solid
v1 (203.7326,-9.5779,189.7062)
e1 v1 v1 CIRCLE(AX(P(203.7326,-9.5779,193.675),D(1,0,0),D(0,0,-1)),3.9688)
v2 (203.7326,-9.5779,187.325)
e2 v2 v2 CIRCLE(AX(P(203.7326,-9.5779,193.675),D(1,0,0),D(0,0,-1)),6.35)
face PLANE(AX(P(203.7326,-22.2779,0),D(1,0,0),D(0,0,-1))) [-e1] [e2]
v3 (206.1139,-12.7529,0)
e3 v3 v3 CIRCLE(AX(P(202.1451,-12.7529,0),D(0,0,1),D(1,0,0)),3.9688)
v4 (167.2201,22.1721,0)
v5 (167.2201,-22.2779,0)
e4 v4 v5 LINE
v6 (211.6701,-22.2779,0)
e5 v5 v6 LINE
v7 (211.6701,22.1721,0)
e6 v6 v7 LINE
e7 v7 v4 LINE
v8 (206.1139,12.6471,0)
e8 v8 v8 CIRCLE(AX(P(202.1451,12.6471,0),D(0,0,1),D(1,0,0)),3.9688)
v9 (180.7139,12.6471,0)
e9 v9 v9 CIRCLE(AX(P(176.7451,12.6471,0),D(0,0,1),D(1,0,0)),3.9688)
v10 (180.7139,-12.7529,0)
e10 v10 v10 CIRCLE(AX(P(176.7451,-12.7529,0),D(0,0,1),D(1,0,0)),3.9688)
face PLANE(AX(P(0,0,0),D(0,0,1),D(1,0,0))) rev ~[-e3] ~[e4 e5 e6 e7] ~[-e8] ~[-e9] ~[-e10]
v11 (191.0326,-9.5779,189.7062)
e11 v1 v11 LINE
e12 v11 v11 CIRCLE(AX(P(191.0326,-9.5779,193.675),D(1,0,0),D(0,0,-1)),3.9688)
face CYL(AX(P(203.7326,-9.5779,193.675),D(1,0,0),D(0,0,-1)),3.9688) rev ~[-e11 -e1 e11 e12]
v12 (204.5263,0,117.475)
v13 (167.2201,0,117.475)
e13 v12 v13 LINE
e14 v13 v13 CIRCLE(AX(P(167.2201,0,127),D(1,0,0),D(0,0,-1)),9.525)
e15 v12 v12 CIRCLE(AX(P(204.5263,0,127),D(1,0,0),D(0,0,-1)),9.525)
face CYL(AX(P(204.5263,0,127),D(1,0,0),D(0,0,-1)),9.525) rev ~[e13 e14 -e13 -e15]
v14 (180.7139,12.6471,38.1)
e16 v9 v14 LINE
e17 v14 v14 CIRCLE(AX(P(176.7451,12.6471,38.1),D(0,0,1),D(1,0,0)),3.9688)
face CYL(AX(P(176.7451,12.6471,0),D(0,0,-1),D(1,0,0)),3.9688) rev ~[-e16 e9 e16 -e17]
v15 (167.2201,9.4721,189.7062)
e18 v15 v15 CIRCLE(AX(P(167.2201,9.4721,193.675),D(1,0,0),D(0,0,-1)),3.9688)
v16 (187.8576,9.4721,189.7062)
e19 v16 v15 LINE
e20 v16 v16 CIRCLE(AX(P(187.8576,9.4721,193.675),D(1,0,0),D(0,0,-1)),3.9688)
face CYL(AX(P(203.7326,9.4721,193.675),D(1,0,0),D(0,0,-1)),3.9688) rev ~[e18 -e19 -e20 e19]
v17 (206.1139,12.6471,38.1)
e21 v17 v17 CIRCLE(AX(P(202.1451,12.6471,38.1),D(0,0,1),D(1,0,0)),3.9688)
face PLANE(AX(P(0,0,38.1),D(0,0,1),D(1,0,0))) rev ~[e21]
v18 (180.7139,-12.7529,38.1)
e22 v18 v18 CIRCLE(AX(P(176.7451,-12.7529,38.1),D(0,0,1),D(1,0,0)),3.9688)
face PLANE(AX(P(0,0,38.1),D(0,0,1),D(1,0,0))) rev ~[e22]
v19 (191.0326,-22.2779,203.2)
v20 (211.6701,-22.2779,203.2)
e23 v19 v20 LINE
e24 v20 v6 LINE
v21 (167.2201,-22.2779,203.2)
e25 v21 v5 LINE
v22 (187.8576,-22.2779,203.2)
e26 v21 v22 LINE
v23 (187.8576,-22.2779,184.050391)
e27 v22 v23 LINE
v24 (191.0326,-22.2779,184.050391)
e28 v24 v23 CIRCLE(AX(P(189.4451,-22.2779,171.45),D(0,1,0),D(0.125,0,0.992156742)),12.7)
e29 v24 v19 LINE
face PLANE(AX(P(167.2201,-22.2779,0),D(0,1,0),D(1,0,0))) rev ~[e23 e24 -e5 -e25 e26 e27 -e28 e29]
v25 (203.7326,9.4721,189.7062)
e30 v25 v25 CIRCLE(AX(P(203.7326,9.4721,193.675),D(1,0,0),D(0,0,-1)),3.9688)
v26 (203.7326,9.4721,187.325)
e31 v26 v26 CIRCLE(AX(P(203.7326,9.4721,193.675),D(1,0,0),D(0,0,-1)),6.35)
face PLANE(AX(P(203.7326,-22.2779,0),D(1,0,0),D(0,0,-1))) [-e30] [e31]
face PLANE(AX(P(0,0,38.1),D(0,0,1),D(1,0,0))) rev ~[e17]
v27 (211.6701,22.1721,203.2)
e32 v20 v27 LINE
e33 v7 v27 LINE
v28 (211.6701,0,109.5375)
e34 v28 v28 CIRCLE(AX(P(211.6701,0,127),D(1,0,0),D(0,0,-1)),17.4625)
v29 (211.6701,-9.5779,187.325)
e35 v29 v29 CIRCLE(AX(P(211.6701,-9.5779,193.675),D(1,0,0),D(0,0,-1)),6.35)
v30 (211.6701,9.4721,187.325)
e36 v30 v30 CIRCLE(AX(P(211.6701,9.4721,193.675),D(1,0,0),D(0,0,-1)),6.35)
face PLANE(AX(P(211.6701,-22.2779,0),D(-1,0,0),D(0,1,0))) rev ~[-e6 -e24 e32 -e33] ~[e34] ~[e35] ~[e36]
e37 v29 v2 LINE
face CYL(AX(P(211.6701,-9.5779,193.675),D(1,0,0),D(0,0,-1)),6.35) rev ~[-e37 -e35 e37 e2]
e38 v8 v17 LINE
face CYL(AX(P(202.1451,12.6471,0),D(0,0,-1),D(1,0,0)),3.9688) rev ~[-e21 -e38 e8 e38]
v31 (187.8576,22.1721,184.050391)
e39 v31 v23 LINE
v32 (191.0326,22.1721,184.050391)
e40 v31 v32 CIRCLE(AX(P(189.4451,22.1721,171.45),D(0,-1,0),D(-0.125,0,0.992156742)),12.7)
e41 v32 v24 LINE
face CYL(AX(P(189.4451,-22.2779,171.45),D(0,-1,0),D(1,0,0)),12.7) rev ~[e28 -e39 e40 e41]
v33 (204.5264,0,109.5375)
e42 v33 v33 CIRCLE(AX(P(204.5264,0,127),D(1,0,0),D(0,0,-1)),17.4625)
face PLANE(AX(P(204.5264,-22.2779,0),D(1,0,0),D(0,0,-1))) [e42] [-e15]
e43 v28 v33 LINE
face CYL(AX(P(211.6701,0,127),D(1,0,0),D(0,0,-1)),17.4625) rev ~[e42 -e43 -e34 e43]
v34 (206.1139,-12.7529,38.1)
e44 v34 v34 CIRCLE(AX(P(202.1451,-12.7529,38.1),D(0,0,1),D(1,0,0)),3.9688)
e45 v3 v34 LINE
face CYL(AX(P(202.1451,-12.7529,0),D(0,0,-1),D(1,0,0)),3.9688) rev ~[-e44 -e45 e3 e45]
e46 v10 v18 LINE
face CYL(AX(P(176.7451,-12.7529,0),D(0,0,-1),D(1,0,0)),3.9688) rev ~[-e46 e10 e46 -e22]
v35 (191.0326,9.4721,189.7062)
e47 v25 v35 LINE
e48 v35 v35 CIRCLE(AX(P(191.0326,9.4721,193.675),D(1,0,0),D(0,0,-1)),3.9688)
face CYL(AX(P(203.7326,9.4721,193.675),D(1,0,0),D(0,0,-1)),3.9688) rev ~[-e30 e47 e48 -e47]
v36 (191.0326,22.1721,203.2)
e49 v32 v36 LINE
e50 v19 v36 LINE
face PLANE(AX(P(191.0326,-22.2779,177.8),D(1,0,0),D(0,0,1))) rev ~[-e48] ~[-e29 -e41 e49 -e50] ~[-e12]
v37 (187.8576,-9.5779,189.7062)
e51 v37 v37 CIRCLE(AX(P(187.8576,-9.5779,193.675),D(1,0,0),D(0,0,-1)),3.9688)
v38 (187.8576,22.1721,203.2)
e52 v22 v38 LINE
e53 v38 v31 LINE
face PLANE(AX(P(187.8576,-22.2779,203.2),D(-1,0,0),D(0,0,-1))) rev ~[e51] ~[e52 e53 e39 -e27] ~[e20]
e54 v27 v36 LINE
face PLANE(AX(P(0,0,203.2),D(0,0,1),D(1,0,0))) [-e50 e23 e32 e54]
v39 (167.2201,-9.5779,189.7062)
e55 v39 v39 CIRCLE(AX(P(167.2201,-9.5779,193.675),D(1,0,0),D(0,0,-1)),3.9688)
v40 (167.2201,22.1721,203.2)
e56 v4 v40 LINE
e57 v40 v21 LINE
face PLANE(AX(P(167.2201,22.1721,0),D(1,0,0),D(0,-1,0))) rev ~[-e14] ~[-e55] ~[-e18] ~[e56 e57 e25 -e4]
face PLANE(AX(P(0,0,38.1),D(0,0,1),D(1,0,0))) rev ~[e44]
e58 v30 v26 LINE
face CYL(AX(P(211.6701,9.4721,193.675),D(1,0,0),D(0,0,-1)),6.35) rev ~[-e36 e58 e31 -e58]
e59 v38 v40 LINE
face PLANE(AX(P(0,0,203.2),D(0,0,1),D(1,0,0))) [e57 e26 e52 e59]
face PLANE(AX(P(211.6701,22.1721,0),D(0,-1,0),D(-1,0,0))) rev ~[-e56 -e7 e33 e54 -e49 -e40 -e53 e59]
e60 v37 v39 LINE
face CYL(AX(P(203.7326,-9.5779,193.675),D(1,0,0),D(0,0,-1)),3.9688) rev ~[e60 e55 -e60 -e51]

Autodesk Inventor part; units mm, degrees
ref_plane "YZ Plane" through (0, 0, 0) normal (1, 0, 0) x (0, 1, 0)
ref_plane "XZ Plane" through (0, 0, 0) normal (0, 1, 0) x (-1, 0, 0)
ref_plane "XY Plane" through (0, 0, 0) normal (0, 0, 1) x (1, 0, 0)
sketch "Sketch1" plane through (0, 0, 0) normal (0, 0, 1) x (1, 0, 0)
  circle A0 centre (202.1451, 12.6471) radius 3.9688 projected
  circle A1 centre (202.1451, -12.7529) radius 3.9688 projected
  circle A2 centre (176.7451, 12.6471) radius 3.9688 projected
  circle A3 centre (176.7451, -12.7529) radius 3.9688 projected
  line L0 (211.6701, 22.1721) -> (167.2201, 22.1721)
  line L1 (167.2201, 22.1721) -> (167.2201, -22.2779)
  line L2 (167.2201, -22.2779) -> (211.6701, -22.2779)
  line L3 (211.6701, -22.2779) -> (211.6701, 22.1721)
  point P0 (0, 0)
  dimension "d0" = 9.525
  dimension "d1" = 9.525
  dimension "d2" = 44.45
  dimension "d3" = 44.45
extrude "Extrusion1" add sketch "Sketch1" along normal blind 38.1
sketch "Sketch2" plane through (0, 0, 38.1) normal (0, 0, 1) x (1, 0, 0)
  line L0 (211.6701, -22.2779) -> (211.6701, 22.1721) projected
  line L1 (167.2201, 22.1721) -> (167.2201, -22.2779) projected
  line L2 (211.6701, 22.1721) -> (167.2201, 22.1721)
  line L3 (167.2201, 22.1721) -> (167.2201, -22.2779)
  line L4 (167.2201, -22.2779) -> (211.6701, -22.2779)
  line L5 (211.6701, -22.2779) -> (211.6701, 22.1721)
  point P0 (0, 0)
extrude "Extrusion2" add sketch "Sketch2" along normal blind 165.1
sketch "Sketch3" plane through (167.2201, -22.2779, 0) normal (-1, 0, 0) x (0, 0, 1)
  point P0 (0, 22.2779)
sketch "Sketch4" plane through (211.6701, -22.2779, 0) normal (1, 0, 0) x (0, 0, -1)
  circle A0 centre (-127, 22.2779) radius 17.4625
  point P0 (0, 22.2779)
  dimension "d8" = 34.925
  dimension "d11" = 127
extrude "Extrusion3" cut sketch "Sketch4" against normal blind 7.1437
sketch "Sketch5" plane through (204.5263, 0, 127) normal (1, 0, 0) x (0, 0, -1)
  circle A0 centre (0, 0) radius 9.525
  point P0 (127, 0)
  dimension "d12" = 19.05
extrude "Extrusion4" cut sketch "Sketch5" against normal blind 50.8
sketch "Sketch6" plane through (167.2201, -22.2779, 0) normal (0, -1, 0) x (1, 0, 0)
  circle A0 centre (22.225, 171.45) radius 12.7
  line L0 (0, 203.2) -> (44.45, 203.2) projected
  point P0 (-167.2201, 0)
  dimension "d15" = 25.4
  dimension "d16" = 31.75
extrude "Extrusion5" cut sketch "Sketch6" against normal blind 50.8
sketch "Sketch7" plane through (167.2201, -22.2779, 0) normal (0, -1, 0) x (1, 0, 0)
  line L0 (44.45, 203.2) -> (0, 203.2) projected
  line L1 (23.8125, 203.2) -> (20.6375, 203.2)
  line L2 (20.6375, 203.2) -> (20.6375, 177.8)
  line L3 (20.6375, 177.8) -> (23.8125, 177.8)
  line L4 (23.8125, 177.8) -> (23.8125, 203.2)
  line L5 (44.45, 0) -> (44.45, 203.2) projected
  point P0 (-167.2201, 0)
  dimension "d19" = 3.175
  dimension "d20" = 20.6375
  dimension "d21" = 25.4
extrude "Extrusion6" cut sketch "Sketch7" against normal blind 50.8
sketch "Sketch8" plane through (211.6701, -22.2779, 0) normal (1, 0, 0) x (0, 0, -1)
  circle A0 centre (-193.675, 31.75) radius 6.35
  line L0 (-203.2, 0) -> (-203.2, 44.45) projected
  circle A1 centre (-193.675, 12.7) radius 6.35
  line L1 (0, 44.45) -> (-203.2, 44.45) projected
  line L2 (0, 0) -> (-203.2, 0) projected
  point P0 (0, 22.2779)
  dimension "d24" = 12.7
  dimension "d25" = 9.525
  dimension "d26" = 12.7
  dimension "d27" = 12.7
  dimension "d28" = 12.7
extrude "Extrusion7" cut sketch "Sketch8" against normal blind 7.9375
sketch "Sketch9" plane through (203.7326, 9.4721, 193.675) normal (1, 0, 0) x (0, 0, -1)
  circle A0 centre (0, 0) radius 6.35 projected
  circle A1 centre (0, 0) radius 3.9688
  circle A2 centre (0, -19.05) radius 6.35 projected
  circle A3 centre (0, -19.05) radius 3.9688
  point P0 (193.675, -9.4721)
  dimension "d31" = 7.9375
  dimension "d32" = 7.9375
extrude "Extrusion8" cut sketch "Sketch9" against normal blind 38.1 contours A1 | A3
properties part number "Corner Stand"
